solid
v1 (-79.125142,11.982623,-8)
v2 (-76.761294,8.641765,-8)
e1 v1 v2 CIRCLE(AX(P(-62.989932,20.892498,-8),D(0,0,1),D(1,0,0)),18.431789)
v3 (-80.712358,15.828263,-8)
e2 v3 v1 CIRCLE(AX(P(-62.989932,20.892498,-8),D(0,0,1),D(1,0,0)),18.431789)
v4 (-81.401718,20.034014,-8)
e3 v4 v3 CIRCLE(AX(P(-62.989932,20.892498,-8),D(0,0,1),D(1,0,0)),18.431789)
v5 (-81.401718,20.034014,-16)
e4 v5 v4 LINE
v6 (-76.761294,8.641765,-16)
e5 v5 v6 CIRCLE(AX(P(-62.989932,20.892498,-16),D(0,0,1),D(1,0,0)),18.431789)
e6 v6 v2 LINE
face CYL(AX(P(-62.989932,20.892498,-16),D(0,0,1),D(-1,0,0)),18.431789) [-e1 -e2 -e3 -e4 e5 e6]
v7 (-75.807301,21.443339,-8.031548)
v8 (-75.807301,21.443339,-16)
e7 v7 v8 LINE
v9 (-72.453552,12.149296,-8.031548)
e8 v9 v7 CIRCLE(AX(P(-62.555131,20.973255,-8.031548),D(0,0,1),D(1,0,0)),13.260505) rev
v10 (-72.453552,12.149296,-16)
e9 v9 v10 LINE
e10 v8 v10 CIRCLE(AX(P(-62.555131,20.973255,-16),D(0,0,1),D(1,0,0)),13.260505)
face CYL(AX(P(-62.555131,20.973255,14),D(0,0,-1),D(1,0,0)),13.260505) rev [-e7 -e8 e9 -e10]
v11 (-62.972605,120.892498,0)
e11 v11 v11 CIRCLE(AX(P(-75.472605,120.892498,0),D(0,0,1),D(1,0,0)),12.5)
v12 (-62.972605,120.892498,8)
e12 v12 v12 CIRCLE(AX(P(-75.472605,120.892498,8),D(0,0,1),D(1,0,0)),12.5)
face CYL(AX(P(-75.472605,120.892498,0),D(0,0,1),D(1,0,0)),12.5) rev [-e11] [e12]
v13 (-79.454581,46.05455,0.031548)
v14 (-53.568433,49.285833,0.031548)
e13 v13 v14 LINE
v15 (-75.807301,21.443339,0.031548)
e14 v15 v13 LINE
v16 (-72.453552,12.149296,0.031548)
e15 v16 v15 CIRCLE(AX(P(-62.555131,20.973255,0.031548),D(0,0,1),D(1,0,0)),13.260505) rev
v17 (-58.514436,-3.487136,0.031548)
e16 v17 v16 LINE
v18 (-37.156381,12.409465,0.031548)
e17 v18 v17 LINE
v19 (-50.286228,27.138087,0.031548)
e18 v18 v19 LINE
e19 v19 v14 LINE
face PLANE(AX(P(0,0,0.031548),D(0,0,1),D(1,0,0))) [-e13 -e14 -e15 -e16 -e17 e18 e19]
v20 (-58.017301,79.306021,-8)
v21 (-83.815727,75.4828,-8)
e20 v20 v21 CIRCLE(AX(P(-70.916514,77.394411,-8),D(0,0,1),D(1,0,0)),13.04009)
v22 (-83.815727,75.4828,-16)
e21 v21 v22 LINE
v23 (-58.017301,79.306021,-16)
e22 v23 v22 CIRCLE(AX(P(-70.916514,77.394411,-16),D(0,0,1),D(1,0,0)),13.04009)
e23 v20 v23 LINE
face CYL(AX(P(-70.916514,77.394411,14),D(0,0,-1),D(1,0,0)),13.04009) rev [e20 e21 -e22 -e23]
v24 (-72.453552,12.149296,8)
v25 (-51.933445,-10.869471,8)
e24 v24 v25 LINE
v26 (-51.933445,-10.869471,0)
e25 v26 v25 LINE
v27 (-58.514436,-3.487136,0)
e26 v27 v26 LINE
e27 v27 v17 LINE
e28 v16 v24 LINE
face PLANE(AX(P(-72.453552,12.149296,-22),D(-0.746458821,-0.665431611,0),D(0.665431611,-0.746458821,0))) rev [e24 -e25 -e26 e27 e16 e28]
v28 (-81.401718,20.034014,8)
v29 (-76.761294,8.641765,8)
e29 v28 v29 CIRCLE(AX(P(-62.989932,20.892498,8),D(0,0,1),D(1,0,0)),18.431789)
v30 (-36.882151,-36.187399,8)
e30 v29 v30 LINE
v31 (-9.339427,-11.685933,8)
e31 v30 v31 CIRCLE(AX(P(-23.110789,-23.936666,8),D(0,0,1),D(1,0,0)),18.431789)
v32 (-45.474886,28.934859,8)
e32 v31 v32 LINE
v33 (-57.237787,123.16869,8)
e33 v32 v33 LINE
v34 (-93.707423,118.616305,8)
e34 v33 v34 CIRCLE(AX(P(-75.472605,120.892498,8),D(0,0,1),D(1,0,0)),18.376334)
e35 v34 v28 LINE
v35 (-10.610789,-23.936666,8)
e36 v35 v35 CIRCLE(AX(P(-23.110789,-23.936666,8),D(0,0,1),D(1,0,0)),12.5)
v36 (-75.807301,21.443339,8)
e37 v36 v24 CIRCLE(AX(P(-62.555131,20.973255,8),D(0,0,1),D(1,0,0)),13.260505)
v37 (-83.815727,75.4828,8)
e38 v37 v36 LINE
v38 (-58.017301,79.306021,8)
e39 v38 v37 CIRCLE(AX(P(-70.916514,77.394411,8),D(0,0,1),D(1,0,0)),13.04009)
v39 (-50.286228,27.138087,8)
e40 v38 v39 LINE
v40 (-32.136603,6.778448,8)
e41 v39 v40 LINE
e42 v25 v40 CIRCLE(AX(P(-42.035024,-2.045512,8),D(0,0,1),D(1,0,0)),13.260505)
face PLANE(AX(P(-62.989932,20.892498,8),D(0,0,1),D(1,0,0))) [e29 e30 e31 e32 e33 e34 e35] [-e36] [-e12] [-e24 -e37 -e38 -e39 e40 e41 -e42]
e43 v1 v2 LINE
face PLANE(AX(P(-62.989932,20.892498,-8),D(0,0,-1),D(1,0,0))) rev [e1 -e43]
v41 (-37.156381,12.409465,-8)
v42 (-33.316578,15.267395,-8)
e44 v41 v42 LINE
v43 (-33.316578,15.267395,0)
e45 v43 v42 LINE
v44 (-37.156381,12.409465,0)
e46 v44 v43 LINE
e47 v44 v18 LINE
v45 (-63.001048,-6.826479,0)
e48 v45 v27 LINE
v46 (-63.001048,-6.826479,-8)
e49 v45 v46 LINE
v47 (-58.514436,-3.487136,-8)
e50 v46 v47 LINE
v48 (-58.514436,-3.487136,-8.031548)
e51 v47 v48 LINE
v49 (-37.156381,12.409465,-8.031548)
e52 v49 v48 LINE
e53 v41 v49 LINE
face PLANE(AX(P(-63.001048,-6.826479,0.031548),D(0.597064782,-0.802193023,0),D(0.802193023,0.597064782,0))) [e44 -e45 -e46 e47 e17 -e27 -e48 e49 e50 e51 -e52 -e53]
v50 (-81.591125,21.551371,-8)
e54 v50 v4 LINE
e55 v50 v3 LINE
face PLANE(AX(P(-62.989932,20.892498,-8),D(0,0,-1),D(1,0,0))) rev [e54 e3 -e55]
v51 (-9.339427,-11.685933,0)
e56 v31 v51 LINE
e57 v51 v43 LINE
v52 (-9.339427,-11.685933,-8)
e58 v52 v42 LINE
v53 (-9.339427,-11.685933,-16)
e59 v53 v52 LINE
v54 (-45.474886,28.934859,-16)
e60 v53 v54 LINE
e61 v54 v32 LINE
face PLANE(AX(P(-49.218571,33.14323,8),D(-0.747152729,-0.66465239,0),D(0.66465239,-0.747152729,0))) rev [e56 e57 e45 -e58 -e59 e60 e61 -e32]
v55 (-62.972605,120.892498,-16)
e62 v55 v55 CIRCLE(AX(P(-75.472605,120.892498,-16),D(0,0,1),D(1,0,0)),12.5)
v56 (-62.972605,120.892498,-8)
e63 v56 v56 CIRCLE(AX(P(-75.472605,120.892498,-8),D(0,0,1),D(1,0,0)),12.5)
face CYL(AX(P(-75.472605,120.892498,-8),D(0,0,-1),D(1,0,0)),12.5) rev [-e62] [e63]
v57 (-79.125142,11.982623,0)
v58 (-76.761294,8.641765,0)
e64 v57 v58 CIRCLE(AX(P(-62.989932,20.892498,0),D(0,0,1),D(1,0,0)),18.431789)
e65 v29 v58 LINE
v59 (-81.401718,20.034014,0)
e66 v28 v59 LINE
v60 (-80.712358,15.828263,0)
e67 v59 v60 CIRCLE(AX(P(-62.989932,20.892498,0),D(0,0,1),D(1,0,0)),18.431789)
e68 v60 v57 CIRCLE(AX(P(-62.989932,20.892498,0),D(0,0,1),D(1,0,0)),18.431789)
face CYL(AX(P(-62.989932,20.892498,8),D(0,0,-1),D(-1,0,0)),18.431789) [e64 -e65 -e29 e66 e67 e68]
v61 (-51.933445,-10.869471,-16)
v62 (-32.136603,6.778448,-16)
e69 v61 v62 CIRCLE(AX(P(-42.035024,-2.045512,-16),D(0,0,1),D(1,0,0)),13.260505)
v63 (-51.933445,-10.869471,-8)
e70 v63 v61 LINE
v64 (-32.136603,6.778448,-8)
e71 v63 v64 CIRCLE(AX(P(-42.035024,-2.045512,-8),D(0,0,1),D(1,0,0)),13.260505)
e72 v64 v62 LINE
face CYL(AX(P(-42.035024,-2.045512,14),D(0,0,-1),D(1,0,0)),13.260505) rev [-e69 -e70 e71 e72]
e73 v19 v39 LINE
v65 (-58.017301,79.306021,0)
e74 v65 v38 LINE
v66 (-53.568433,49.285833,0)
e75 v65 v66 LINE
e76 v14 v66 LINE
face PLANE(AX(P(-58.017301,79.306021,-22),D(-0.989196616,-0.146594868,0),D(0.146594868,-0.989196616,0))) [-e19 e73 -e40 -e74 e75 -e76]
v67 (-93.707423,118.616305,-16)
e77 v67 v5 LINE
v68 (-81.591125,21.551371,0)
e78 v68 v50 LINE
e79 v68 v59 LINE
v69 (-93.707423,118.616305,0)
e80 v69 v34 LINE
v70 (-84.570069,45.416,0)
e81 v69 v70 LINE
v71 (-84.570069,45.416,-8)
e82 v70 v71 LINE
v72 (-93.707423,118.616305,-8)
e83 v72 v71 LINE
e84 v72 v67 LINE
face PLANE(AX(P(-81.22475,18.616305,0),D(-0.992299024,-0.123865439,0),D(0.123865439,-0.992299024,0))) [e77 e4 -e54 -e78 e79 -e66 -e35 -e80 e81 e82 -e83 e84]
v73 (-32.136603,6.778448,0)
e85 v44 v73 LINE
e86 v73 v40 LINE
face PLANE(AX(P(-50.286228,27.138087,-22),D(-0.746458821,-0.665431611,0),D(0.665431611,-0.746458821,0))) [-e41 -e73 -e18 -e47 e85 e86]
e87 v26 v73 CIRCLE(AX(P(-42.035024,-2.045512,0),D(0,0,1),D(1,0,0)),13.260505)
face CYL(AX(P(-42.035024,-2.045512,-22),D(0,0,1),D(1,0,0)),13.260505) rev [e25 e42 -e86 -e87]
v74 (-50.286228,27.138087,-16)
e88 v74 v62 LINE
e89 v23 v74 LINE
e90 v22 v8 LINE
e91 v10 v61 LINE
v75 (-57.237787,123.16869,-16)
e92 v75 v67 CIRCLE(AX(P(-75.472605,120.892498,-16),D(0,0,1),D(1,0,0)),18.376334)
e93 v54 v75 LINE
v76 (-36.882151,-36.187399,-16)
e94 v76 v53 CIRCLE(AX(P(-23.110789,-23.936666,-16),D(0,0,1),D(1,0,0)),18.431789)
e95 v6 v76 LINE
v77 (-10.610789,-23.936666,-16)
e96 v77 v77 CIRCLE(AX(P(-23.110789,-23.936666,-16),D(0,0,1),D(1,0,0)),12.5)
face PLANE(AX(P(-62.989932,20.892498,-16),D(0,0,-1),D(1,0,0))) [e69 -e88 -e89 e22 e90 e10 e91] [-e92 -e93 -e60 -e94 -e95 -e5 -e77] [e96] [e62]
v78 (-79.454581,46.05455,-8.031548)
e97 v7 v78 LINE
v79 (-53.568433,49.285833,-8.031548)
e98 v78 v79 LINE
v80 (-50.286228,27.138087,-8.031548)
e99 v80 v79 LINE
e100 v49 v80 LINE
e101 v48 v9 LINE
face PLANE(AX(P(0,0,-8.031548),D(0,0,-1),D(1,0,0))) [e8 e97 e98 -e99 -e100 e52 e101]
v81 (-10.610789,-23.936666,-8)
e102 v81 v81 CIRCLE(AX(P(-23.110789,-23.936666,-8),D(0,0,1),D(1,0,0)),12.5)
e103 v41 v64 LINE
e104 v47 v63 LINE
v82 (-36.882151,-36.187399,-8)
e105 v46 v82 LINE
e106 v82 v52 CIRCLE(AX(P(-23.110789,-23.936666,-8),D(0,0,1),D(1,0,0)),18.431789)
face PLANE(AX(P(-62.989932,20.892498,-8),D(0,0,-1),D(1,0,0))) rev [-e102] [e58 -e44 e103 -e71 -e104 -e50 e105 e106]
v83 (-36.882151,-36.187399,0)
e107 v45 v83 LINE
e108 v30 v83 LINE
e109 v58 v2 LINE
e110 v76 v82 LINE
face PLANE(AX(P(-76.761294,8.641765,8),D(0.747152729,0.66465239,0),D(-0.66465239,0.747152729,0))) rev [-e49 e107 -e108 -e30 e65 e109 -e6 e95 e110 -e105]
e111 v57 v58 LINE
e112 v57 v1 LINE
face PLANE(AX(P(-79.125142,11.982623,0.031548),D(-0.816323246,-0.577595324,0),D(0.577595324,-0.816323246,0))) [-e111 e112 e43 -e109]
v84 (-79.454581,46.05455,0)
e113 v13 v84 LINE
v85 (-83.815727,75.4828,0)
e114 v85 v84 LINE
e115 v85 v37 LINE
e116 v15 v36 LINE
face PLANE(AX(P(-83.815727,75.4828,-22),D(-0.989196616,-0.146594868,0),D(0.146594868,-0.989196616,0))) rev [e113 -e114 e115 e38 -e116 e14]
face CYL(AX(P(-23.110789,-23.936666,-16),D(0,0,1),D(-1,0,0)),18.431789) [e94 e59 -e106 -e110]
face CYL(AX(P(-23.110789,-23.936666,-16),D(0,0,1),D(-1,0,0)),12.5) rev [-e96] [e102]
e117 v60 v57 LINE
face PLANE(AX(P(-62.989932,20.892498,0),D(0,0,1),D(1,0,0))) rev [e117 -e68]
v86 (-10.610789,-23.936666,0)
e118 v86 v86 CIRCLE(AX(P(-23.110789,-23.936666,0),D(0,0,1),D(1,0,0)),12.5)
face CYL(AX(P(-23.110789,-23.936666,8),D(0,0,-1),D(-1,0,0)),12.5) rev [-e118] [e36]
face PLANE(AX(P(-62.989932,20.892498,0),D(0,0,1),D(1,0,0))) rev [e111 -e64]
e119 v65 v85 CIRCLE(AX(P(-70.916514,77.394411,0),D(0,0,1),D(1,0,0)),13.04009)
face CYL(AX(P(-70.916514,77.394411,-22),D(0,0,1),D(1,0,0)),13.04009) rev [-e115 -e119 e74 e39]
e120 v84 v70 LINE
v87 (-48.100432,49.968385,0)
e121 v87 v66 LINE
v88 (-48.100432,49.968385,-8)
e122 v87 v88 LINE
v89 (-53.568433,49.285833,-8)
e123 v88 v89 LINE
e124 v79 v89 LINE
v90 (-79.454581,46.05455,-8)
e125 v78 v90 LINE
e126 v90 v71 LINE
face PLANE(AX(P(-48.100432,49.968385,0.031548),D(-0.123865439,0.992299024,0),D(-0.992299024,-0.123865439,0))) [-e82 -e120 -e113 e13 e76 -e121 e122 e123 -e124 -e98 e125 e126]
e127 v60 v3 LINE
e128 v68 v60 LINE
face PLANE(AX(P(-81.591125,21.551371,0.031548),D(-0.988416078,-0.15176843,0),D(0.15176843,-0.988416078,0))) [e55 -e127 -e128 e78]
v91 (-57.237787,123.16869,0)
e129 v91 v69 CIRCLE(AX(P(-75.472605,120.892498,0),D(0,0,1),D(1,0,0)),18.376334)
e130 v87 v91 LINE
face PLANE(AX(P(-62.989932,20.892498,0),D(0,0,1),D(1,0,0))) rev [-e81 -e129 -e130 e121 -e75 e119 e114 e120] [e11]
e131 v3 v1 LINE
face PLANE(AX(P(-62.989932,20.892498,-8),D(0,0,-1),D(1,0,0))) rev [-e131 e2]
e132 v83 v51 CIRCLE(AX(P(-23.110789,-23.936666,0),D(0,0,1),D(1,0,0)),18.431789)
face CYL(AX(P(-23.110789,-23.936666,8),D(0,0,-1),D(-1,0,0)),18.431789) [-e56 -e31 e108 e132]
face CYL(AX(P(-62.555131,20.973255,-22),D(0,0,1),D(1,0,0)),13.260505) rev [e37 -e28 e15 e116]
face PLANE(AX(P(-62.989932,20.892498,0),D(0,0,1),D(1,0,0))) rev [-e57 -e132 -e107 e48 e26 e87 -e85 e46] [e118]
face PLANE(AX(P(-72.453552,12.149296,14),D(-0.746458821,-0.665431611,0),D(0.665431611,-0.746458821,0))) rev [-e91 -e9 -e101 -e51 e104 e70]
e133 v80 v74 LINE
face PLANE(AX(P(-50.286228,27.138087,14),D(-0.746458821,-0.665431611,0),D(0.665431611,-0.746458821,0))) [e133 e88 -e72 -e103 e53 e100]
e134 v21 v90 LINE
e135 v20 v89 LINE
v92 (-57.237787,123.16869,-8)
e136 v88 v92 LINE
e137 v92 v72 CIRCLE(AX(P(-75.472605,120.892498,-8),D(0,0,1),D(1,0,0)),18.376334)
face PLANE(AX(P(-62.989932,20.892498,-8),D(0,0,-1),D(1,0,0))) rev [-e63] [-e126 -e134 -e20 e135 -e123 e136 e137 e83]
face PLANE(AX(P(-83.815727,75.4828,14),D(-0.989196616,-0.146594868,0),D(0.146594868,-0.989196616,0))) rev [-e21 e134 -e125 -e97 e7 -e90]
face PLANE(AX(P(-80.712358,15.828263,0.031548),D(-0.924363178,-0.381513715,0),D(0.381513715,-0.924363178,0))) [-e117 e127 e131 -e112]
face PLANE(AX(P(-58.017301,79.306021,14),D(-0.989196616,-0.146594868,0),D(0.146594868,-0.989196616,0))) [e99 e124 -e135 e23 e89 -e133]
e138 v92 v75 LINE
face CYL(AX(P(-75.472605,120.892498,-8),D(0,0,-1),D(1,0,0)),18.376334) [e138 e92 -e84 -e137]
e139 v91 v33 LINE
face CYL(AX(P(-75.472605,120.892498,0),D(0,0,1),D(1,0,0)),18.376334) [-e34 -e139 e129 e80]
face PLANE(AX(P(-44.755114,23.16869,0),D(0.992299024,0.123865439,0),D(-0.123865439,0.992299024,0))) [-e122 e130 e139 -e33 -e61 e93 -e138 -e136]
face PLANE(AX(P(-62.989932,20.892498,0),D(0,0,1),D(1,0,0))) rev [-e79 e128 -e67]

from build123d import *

# Parameters (mm, degrees)
SKETCH_1_R          = 12.5
EXTRUDE_1_DEPTH     = 8
EXTRUDE_START       = -8
SKETCH_2_R          = 12.5
EXTRUDE_2_DEPTH     = 8
CUT_EXTRUDE_6_DEPTH = 30
EXTRUDE_START_2     = -0.031547984
EXTRUDE_3_DEPTH     = 4.031547984
MIRROR_START        = -16
MIRROR_1_OUTLINE_R  = 12.5
MIRROR_1_DEPTH      = 8
MIRROR_START_2      = -8.031547984
MIRROR_1_2_DEPTH    = 4.031547984


# Read off the part's stored shape, not the designer's step: 镜向1
with BuildPart() as part:
    # 草图1 → 凸台-拉伸1 (new body)
    with BuildSketch(Plane.XY):
        with BuildLine():
            Line((-49.218570577, 33.143230451), (-9.339427202, -11.685933312))
            ThreePointArc((-9.339427202, -11.685933312), (-10.860056091, -37.708027961), (-36.882150741, -36.187399071))
            Line((-36.882150741, -36.187399071), (-76.761294116, 8.641764691))
            ThreePointArc((-76.761294116, 8.641764691), (-75.240665226, 34.663859341), (-49.218570577, 33.143230451))
        make_face()
        with Locations((-23.110788971, -23.936666192)):
            Circle(SKETCH_1_R, mode=Mode.SUBTRACT)
        with Locations((-62.989932346, 20.892497571)):
            Circle(SKETCH_1_R, mode=Mode.SUBTRACT)
    extrude(amount=EXTRUDE_1_DEPTH)

    # 草图2 → 凸台-拉伸2 (add)
    with BuildSketch(Plane.XY.offset(8).offset(EXTRUDE_START)):
        with BuildLine():
            Line((-81.224750465, 18.616304916), (-93.707423119, 118.616304916))
            ThreePointArc((-93.707423119, 118.616304916), (-77.748797655, 139.12731569), (-57.237786881, 123.168690226))
            Line((-57.237786881, 123.168690226), (-44.755114228, 23.168690226))
            ThreePointArc((-44.755114228, 23.168690226), (-60.713739692, 2.657679452), (-81.224750465, 18.616304916))
        make_face()
        with Locations((-62.989932346, 20.892497571)):
            Circle(SKETCH_2_R, mode=Mode.SUBTRACT)
        with Locations((-75.472605, 120.892497571)):
            Circle(SKETCH_2_R, mode=Mode.SUBTRACT)
    extrude(amount=EXTRUDE_2_DEPTH)

    # 草图4 → 切除-拉伸6 (cut)
    with BuildSketch(Plane.XY.offset(8)):
        with BuildLine():
            Line((-50.286228122, 27.138087208), (-32.136603064, 6.778447679))
            ThreePointArc((-32.136603064, 6.778447679), (-33.211064798, -11.943932547), (-51.933445024, -10.869470813))
            Line((-51.933445024, -10.869470813), (-72.45355192, 12.149295588))
            ThreePointArc((-72.45355192, 12.149295588), (-75.02839357, 16.472286713), (-75.807301146, 21.443339396))
            Line((-75.807301146, 21.443339396), (-83.815726922, 75.482800481))
            ThreePointArc((-83.815726922, 75.482800481), (-72.828124355, 90.29362358), (-58.017301256, 79.306021012))
            Line((-58.017301256, 79.306021012), (-50.286228122, 27.138087208))
        make_face()
    extrude(amount=-CUT_EXTRUDE_6_DEPTH, mode=Mode.SUBTRACT)

    # 草图5 → 凸台-拉伸3 (add)
    with BuildSketch(Plane(origin=(0, 0, 0), x_dir=(-1, 0, 0), z_dir=(0, 0, -1)).offset(EXTRUDE_START_2)):
        Polygon((48.100432454, 49.968385441), (84.570068691, 45.416000132), (81.591125202, 21.551371363), (80.712358407, 15.828262623), (79.125142105, 11.982622874), (76.761294116, 8.641764691), (63.001048061, -6.826479398), (33.316578165, 15.267394572), (45.474886231, 28.934859247), align=None)
    extrude(amount=EXTRUDE_3_DEPTH)



with BuildPart() as body_2:
    # 镜向1 outline → 镜向1 (new body)
    with BuildSketch(Plane.XY.offset(MIRROR_START)):
        with BuildLine():
            ThreePointArc((-81.401718429, 20.034013842), (-80.059923167, 13.939349041), (-76.761294116, 8.641764691))
            Line((-76.761294116, 8.641764691), (-36.882150741, -36.187399071))
            ThreePointArc((-36.882150741, -36.187399071), (-10.860056092, -37.708027961), (-9.339427202, -11.685933312))
            Line((-9.339427202, -11.685933312), (-45.474886231, 28.934859247))
            Line((-45.474886231, 28.934859247), (-57.237786881, 123.168690226))
            ThreePointArc((-57.237786881, 123.168690226), (-77.748797655, 139.12731569), (-93.707423119, 118.616304916))
            Line((-93.707423119, 118.616304916), (-81.401718429, 20.034013842))
        make_face()
        with BuildLine():
            Line((-75.807301146, 21.443339396), (-83.815726922, 75.482800481))
            ThreePointArc((-83.815726922, 75.482800481), (-72.828124355, 90.29362358), (-58.017301256, 79.306021012))
            Line((-58.017301256, 79.306021012), (-50.286228122, 27.138087208))
            Line((-50.286228122, 27.138087208), (-32.136603064, 6.778447679))
            ThreePointArc((-32.136603064, 6.778447679), (-33.211064798, -11.943932547), (-51.933445024, -10.869470813))
            Line((-51.933445024, -10.869470813), (-72.45355192, 12.149295588))
            ThreePointArc((-72.45355192, 12.149295588), (-75.02839357, 16.472286713), (-75.807301146, 21.443339396))
        make_face(mode=Mode.SUBTRACT)
        with Locations((-75.472605, 120.892497571)):
            Circle(MIRROR_1_OUTLINE_R, mode=Mode.SUBTRACT)
        with Locations((-23.110788971, -23.936666192)):
            Circle(MIRROR_1_OUTLINE_R, mode=Mode.SUBTRACT)
    extrude(amount=MIRROR_1_DEPTH)


with BuildPart() as part_1:
    add(part.part)

    add(body_2.part)  # Mirror 1 2 merges body 2
    # Mirror 1 2 outline → Mirror 1 2 (add)
    with BuildSketch(Plane.XY.offset(MIRROR_START_2)):
        Polygon((-81.591125202, 21.551371363), (-80.712358407, 15.828262623), (-79.125142105, 11.982622874), (-76.761294116, 8.641764691), (-63.001048061, -6.826479398), (-33.316578165, 15.267394572), (-45.474886231, 28.934859247), (-48.100432453, 49.968385441), (-84.570068691, 45.416000132), align=None)
    extrude(amount=MIRROR_1_2_DEPTH)


solid = part_1.part
